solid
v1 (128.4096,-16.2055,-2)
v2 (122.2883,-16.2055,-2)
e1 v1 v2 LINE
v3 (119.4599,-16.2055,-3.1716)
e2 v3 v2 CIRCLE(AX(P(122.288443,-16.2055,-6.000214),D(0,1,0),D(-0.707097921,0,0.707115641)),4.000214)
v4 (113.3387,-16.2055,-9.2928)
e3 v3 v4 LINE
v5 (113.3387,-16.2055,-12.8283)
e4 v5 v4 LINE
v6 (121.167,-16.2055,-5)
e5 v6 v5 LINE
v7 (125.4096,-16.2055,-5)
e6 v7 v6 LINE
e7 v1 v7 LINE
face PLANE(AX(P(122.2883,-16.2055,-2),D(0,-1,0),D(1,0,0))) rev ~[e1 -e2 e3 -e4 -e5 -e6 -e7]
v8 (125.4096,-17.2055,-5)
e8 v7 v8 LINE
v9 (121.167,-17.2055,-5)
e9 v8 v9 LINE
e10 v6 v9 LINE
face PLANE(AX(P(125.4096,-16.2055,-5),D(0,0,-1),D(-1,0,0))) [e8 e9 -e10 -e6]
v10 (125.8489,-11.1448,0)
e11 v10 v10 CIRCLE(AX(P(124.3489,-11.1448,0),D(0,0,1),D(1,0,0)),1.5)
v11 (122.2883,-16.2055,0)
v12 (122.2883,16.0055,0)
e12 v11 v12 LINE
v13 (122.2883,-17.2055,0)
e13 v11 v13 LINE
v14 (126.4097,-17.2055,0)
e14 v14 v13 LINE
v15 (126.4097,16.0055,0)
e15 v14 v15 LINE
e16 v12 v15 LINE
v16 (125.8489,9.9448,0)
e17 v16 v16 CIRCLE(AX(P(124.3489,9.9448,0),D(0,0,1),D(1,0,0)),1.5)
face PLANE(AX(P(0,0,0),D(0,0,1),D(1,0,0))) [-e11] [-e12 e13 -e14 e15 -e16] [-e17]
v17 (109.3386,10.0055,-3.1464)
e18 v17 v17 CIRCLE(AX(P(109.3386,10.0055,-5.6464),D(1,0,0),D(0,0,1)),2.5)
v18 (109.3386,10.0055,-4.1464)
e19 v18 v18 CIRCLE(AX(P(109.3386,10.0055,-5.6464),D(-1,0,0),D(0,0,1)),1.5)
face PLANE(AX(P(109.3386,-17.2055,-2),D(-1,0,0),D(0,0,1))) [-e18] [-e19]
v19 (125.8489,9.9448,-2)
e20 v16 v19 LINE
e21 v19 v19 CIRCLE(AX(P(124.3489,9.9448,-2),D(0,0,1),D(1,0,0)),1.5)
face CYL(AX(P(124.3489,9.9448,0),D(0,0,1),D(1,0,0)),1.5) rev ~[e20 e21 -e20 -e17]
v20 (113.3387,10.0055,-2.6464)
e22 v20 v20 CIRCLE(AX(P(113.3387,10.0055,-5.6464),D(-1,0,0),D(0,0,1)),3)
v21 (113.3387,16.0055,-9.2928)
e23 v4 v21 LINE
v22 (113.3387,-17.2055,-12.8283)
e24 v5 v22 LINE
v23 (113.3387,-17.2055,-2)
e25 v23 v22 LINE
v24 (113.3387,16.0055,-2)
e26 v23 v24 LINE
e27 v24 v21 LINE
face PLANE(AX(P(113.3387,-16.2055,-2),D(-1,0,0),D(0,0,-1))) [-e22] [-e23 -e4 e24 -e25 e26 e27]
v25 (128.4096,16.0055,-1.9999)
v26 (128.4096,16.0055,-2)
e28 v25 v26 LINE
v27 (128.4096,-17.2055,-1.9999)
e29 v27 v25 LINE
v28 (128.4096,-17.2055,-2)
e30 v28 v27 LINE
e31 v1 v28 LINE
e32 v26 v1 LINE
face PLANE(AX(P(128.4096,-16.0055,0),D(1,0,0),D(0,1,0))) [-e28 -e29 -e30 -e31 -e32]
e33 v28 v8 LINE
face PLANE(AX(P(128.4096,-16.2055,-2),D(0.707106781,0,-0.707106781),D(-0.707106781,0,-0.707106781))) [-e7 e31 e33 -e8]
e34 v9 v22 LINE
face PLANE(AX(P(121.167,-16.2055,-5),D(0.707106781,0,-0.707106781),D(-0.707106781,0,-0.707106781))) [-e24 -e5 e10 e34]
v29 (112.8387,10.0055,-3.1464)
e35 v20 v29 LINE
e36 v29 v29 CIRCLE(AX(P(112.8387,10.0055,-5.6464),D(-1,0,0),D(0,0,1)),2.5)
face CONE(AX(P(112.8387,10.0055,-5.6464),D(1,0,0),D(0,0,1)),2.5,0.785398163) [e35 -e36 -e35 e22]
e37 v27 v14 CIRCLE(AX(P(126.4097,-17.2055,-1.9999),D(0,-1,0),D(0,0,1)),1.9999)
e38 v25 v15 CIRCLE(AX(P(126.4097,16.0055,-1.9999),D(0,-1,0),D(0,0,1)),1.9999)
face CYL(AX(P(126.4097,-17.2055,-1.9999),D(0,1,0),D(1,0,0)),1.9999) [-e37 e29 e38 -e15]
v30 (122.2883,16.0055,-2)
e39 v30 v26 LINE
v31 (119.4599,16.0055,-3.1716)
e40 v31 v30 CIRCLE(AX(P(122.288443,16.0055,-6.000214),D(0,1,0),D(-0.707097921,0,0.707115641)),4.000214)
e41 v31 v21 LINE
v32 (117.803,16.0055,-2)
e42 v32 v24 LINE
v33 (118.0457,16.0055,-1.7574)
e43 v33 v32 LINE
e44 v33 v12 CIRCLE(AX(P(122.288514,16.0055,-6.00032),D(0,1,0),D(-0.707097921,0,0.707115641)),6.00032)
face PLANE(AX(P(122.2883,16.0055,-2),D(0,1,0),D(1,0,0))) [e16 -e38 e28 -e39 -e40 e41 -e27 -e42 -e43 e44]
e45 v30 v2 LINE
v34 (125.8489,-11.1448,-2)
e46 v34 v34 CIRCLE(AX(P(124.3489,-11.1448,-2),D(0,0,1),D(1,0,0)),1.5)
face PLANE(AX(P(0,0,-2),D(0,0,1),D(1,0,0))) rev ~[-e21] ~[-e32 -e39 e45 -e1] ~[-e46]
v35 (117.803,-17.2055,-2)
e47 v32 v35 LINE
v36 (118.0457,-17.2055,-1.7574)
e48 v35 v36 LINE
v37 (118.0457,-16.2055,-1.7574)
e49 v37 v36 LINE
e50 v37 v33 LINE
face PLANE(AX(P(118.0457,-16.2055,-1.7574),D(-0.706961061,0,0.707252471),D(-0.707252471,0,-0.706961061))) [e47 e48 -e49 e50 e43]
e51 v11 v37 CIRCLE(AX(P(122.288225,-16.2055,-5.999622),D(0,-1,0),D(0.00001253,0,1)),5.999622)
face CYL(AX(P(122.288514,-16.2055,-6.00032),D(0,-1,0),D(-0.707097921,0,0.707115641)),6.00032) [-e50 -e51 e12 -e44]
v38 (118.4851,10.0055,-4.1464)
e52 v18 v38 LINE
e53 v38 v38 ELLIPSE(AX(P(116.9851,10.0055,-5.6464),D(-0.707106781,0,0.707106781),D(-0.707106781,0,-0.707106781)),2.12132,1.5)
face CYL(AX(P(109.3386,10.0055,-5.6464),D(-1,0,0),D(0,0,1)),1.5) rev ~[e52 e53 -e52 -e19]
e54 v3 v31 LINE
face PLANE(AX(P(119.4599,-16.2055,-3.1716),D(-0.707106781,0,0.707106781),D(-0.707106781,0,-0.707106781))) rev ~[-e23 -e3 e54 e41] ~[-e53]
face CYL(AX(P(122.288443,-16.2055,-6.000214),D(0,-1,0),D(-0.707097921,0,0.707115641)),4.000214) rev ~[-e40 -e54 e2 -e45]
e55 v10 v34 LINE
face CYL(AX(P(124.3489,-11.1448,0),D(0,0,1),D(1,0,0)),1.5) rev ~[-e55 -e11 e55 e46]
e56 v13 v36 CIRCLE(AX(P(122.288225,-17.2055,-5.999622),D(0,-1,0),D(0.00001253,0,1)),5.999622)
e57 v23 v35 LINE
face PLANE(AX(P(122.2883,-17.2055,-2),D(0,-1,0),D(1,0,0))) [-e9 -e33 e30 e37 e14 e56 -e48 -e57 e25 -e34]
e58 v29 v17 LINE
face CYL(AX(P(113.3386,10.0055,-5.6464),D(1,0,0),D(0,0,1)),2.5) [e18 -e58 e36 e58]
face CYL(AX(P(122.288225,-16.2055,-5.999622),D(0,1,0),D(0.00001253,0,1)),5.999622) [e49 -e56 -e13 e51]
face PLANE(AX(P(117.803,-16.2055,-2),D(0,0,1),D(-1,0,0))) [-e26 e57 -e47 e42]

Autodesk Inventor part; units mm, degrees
ref_plane "YZ Plane" through (0, 0, 0) normal (1, 0, 0) x (0, 1, 0)
sketch "Sketch1" plane through (0, 0, 0) normal (0, 0, 1) x (1, 0, 0)
  line L0 (122.2883, -16.0055) -> (122.2883, 46.9321) projected
  line L1 (122.2883, -16.0055) -> (128.4096, -16.0055) projected
  line L2 (128.4096, -16.0055) -> (128.4096, 44.4321) projected
  line L3 (136.1877, 44.4321) -> (128.4096, 44.4321) projected
  line L4 (136.1877, 46.9321) -> (136.1877, 44.4321) projected
  line L5 (122.2883, 46.9321) -> (136.1877, 46.9321) projected
  line L6 (3.0607, 16.0055) -> (-1.0607, 16.0055) projected
  line L7 (122.2883, 16.0055) -> (128.4096, 16.0055)
  point P0 (0, 0)
extrude "Extrusion1" add sketch "Sketch1" against normal blind 2 contours L0 L7 L2 L1
sketch "Sketch2" plane through (122.2883, -16.0055, 0) normal (0, -1, 0) x (1, 0, 0)
  line L0 (0, 0) -> (6.1213, 0) projected
  line L1 (0, 0) -> (0, -2) projected
  line L2 (6.1213, -2) -> (0, -2) projected
  line L3 (6.1213, 0) -> (6.1213, -2) projected
  point P0 (-122.2883, 0)
ref_plane "Work Plane1" through (-3.0607, -16.2055, -14.9496) normal (0, 1, 0) x (0.7071068, 0, 0.7071068)
extrude "Extrusion2" add sketch "Sketch2" along normal up to surface (0.2 mm away)
ref_plane "Work Plane2" through (-3.4749, -17.2055, -14.9496) normal (0, -1, 0) x (0.7071068, 0, -0.7071068)
sketch "Sketch3" plane through (122.2883, -16.2055, -2) normal (0, -1, 0) x (1, 0, 0)
  line L0 (0, 2) -> (0, 0)
  line L1 (0, 0) -> (6.1213, 0)
  line L2 (6.1213, 0) -> (6.1213, 2)
  line L3 (6.1213, 2) -> (0, 2)
  arc A0 (-123.3489, 2) -> (-125.3489, 0) centre (-123.3489, 0) ccw
  line L4 (-125.3489, 0) -> (-122.3489, -3)
  line L5 (-122.3489, -3) -> (-118.1063, -3)
  line L6 (-118.1063, -3) -> (-110.278, -10.8283)
  line L7 (-110.278, -10.8283) -> (-110.278, 0)
  line L8 (-110.278, 0) -> (-114.7423, 0)
  line L9 (-114.7423, 0) -> (-114.9849, 0.2426)
  arc A1 (-114.9849, 0.2426) -> (-119.2276, 2) centre (-119.2276, -4) ccw
  line L10 (-119.2276, 2) -> (-123.3489, 2)
  line L11 (-110.278, -10.8283) -> (8.4603, -10.8283)
  line L12 (-110.278, -10.8283) -> (8.4603, -10.8283) construction
  arc A2 (0, 0) -> (-2.8284, -1.1716) centre (0, -4) ccw
  line L13 (-54.1499, -52.493) -> (-2.8284, -1.1716)
  line L14 (-12.4852, -10.8283) -> (-1.6569, -10.8283) construction
  arc A3 (0, 2) -> (-4.2426, 0.2426) centre (0, -4) ccw
  line L15 (-1.1213, -3) -> (-18.8648, -20.7435)
  line L16 (3.1213, -3) -> (-1.1213, -3)
  line L17 (6.1213, 0) -> (3.1213, -3)
  line L18 (-8.9496, -10.8283) -> (81.0504, -10.8283) construction
  line L19 (-8.9496, -10.8283) -> (-8.9496, 0)
  line L20 (-8.9496, -10.8283) -> (1.8787, -10.8283) construction
  line L21 (-8.9496, 0) -> (-4.4853, 0)
  line L22 (-55.5641, -51.0788) -> (-8.9496, -4.4643)
  line L23 (-4.4853, 0) -> (-4.2426, 0.2426)
  point P0 (-122.2883, 2)
extrude "Extrusion3" add sketch "Sketch3" along normal up to surface (1 mm away) contours L3 L2 L1 L0 | L0 A2 L13 L19 L21 L23 A3 | L1 L17 L16 L15 L19 L13 A2
sketch "Sketch4" plane through (122.2883, -16.2055, -2) normal (0, 1, 0) x (1, 0, 0)
  line L0 (-2.8284, 1.1716) -> (-33.605, 31.9482) projected
  arc A0 (-2.8284, 1.1716) -> (0, 0) centre (0, 4) ccw projected
  line L1 (0, -2) -> (0, 0) projected
  arc A1 (-4.2426, -0.2426) -> (0, -2) centre (0, 4) ccw projected
  line L2 (-4.2426, -0.2426) -> (-4.4853, 0) projected
  line L3 (-4.4853, 0) -> (-8.9496, 0) projected
  line L4 (-8.9496, 0) -> (-8.9496, 10.8283) projected
  point P0 (-122.2883, -2)
  point P1 (-8.9496, 7.2928)
extrude "Extrusion4" add sketch "Sketch4" along normal up to surface (32.211 mm away)
fillet "Fillet1" radius 2 1 edges at (128.4096, -0.6, 0)
sketch "Sketch6" plane through (113.3386, -17.2055, -2) normal (-1, 0, 0) x (0, 0, 1)
  circle A0 centre (6.5566, 27.211) radius 35
  line L0 (-7.2928, 1) -> (-7.2928, 33.211) projected
  line L1 (-10.8283, 0) -> (0, 0) projected
  line L2 (0, 33.211) -> (0, 0) projected
  line L3 (0, 33.211) -> (-7.2928, 33.211) projected
  line L4 (-7.2928, 1) -> (-7.2928, 33.211) projected
  line L5 (-7.2928, 1) -> (-10.8283, 1) projected
  line L6 (-10.8283, 1) -> (-10.8283, 0) projected
  line L7 (0, 27.211) -> (-7.2928, 27.211)
  circle A1 centre (-3.6464, 27.211) radius 2.5
  point P0 (2, 17.2055)
  dimension "d16" = 5
extrude "Extrusion5" add sketch "Sketch6" along normal blind 4 contours A1 L7 | L7 A1
chamfer "Chamfer1" distance 0.5 angle 45 1 edges at (113.3386, 10.0055, -8.1464)
sketch "Sketch7" plane through (109.3386, 10.0055, -5.6464) normal (-1, 0, 0) x (0, 0, 1)
  circle A0 centre (0, 0) radius 2.5 projected
  circle A1 centre (0, 0) radius 1.5
  point P0 (5.6464, -10.0055)
  dimension "d22" = 3
extrude "Extrusion6" cut sketch "Sketch7" against normal through all contours A1
sketch "Sketch8" plane through (0, 0, 0) normal (0, 0, 1) x (1, 0, 0)
  line L0 (126.4096, 16.0055) -> (126.4096, -17.2055) projected
  line L1 (126.4096, 16.0055) -> (122.2883, 16.0055) projected
  line L2 (122.2883, 16.0055) -> (122.2883, -17.2055) projected
  line L3 (122.2883, -17.2055) -> (126.4096, -17.2055) projected
  line L4 (122.2883, 16.0055) -> (119.4598, 16.0055) projected
  line L5 (122.2883, 16.0055) -> (126.4096, 16.0055)
  line L6 (126.4096, 16.0055) -> (126.4096, 12.0055)
  line L7 (126.4096, 12.0055) -> (122.2883, 12.0055)
  line L8 (122.2883, 12.0055) -> (122.2883, 16.0055)
  line L9 (122.2883, -17.2055) -> (126.4096, -17.2055)
  line L10 (126.4096, -17.2055) -> (126.4096, -13.2055)
  line L11 (126.4096, -13.2055) -> (122.2883, -13.2055)
  line L12 (122.2883, -13.2055) -> (122.2883, -17.2055)
  circle A0 centre (124.3489, 9.9448) radius 2.0607
  circle A1 centre (124.3489, -11.1448) radius 2.0607
  circle A2 centre (124.3489, 9.9448) radius 1.5
  circle A3 centre (124.3489, -11.1448) radius 1.5
  point P0 (0, 0)
  dimension "d25" = 4
  dimension "d26" = 4
  dimension "d27" = 3
  dimension "d28" = 3
extrude "Extrusion7" cut sketch "Sketch8" against normal blind 10 contours A2 | A3
properties part number "GripperHandleLeft_3DPrint"
